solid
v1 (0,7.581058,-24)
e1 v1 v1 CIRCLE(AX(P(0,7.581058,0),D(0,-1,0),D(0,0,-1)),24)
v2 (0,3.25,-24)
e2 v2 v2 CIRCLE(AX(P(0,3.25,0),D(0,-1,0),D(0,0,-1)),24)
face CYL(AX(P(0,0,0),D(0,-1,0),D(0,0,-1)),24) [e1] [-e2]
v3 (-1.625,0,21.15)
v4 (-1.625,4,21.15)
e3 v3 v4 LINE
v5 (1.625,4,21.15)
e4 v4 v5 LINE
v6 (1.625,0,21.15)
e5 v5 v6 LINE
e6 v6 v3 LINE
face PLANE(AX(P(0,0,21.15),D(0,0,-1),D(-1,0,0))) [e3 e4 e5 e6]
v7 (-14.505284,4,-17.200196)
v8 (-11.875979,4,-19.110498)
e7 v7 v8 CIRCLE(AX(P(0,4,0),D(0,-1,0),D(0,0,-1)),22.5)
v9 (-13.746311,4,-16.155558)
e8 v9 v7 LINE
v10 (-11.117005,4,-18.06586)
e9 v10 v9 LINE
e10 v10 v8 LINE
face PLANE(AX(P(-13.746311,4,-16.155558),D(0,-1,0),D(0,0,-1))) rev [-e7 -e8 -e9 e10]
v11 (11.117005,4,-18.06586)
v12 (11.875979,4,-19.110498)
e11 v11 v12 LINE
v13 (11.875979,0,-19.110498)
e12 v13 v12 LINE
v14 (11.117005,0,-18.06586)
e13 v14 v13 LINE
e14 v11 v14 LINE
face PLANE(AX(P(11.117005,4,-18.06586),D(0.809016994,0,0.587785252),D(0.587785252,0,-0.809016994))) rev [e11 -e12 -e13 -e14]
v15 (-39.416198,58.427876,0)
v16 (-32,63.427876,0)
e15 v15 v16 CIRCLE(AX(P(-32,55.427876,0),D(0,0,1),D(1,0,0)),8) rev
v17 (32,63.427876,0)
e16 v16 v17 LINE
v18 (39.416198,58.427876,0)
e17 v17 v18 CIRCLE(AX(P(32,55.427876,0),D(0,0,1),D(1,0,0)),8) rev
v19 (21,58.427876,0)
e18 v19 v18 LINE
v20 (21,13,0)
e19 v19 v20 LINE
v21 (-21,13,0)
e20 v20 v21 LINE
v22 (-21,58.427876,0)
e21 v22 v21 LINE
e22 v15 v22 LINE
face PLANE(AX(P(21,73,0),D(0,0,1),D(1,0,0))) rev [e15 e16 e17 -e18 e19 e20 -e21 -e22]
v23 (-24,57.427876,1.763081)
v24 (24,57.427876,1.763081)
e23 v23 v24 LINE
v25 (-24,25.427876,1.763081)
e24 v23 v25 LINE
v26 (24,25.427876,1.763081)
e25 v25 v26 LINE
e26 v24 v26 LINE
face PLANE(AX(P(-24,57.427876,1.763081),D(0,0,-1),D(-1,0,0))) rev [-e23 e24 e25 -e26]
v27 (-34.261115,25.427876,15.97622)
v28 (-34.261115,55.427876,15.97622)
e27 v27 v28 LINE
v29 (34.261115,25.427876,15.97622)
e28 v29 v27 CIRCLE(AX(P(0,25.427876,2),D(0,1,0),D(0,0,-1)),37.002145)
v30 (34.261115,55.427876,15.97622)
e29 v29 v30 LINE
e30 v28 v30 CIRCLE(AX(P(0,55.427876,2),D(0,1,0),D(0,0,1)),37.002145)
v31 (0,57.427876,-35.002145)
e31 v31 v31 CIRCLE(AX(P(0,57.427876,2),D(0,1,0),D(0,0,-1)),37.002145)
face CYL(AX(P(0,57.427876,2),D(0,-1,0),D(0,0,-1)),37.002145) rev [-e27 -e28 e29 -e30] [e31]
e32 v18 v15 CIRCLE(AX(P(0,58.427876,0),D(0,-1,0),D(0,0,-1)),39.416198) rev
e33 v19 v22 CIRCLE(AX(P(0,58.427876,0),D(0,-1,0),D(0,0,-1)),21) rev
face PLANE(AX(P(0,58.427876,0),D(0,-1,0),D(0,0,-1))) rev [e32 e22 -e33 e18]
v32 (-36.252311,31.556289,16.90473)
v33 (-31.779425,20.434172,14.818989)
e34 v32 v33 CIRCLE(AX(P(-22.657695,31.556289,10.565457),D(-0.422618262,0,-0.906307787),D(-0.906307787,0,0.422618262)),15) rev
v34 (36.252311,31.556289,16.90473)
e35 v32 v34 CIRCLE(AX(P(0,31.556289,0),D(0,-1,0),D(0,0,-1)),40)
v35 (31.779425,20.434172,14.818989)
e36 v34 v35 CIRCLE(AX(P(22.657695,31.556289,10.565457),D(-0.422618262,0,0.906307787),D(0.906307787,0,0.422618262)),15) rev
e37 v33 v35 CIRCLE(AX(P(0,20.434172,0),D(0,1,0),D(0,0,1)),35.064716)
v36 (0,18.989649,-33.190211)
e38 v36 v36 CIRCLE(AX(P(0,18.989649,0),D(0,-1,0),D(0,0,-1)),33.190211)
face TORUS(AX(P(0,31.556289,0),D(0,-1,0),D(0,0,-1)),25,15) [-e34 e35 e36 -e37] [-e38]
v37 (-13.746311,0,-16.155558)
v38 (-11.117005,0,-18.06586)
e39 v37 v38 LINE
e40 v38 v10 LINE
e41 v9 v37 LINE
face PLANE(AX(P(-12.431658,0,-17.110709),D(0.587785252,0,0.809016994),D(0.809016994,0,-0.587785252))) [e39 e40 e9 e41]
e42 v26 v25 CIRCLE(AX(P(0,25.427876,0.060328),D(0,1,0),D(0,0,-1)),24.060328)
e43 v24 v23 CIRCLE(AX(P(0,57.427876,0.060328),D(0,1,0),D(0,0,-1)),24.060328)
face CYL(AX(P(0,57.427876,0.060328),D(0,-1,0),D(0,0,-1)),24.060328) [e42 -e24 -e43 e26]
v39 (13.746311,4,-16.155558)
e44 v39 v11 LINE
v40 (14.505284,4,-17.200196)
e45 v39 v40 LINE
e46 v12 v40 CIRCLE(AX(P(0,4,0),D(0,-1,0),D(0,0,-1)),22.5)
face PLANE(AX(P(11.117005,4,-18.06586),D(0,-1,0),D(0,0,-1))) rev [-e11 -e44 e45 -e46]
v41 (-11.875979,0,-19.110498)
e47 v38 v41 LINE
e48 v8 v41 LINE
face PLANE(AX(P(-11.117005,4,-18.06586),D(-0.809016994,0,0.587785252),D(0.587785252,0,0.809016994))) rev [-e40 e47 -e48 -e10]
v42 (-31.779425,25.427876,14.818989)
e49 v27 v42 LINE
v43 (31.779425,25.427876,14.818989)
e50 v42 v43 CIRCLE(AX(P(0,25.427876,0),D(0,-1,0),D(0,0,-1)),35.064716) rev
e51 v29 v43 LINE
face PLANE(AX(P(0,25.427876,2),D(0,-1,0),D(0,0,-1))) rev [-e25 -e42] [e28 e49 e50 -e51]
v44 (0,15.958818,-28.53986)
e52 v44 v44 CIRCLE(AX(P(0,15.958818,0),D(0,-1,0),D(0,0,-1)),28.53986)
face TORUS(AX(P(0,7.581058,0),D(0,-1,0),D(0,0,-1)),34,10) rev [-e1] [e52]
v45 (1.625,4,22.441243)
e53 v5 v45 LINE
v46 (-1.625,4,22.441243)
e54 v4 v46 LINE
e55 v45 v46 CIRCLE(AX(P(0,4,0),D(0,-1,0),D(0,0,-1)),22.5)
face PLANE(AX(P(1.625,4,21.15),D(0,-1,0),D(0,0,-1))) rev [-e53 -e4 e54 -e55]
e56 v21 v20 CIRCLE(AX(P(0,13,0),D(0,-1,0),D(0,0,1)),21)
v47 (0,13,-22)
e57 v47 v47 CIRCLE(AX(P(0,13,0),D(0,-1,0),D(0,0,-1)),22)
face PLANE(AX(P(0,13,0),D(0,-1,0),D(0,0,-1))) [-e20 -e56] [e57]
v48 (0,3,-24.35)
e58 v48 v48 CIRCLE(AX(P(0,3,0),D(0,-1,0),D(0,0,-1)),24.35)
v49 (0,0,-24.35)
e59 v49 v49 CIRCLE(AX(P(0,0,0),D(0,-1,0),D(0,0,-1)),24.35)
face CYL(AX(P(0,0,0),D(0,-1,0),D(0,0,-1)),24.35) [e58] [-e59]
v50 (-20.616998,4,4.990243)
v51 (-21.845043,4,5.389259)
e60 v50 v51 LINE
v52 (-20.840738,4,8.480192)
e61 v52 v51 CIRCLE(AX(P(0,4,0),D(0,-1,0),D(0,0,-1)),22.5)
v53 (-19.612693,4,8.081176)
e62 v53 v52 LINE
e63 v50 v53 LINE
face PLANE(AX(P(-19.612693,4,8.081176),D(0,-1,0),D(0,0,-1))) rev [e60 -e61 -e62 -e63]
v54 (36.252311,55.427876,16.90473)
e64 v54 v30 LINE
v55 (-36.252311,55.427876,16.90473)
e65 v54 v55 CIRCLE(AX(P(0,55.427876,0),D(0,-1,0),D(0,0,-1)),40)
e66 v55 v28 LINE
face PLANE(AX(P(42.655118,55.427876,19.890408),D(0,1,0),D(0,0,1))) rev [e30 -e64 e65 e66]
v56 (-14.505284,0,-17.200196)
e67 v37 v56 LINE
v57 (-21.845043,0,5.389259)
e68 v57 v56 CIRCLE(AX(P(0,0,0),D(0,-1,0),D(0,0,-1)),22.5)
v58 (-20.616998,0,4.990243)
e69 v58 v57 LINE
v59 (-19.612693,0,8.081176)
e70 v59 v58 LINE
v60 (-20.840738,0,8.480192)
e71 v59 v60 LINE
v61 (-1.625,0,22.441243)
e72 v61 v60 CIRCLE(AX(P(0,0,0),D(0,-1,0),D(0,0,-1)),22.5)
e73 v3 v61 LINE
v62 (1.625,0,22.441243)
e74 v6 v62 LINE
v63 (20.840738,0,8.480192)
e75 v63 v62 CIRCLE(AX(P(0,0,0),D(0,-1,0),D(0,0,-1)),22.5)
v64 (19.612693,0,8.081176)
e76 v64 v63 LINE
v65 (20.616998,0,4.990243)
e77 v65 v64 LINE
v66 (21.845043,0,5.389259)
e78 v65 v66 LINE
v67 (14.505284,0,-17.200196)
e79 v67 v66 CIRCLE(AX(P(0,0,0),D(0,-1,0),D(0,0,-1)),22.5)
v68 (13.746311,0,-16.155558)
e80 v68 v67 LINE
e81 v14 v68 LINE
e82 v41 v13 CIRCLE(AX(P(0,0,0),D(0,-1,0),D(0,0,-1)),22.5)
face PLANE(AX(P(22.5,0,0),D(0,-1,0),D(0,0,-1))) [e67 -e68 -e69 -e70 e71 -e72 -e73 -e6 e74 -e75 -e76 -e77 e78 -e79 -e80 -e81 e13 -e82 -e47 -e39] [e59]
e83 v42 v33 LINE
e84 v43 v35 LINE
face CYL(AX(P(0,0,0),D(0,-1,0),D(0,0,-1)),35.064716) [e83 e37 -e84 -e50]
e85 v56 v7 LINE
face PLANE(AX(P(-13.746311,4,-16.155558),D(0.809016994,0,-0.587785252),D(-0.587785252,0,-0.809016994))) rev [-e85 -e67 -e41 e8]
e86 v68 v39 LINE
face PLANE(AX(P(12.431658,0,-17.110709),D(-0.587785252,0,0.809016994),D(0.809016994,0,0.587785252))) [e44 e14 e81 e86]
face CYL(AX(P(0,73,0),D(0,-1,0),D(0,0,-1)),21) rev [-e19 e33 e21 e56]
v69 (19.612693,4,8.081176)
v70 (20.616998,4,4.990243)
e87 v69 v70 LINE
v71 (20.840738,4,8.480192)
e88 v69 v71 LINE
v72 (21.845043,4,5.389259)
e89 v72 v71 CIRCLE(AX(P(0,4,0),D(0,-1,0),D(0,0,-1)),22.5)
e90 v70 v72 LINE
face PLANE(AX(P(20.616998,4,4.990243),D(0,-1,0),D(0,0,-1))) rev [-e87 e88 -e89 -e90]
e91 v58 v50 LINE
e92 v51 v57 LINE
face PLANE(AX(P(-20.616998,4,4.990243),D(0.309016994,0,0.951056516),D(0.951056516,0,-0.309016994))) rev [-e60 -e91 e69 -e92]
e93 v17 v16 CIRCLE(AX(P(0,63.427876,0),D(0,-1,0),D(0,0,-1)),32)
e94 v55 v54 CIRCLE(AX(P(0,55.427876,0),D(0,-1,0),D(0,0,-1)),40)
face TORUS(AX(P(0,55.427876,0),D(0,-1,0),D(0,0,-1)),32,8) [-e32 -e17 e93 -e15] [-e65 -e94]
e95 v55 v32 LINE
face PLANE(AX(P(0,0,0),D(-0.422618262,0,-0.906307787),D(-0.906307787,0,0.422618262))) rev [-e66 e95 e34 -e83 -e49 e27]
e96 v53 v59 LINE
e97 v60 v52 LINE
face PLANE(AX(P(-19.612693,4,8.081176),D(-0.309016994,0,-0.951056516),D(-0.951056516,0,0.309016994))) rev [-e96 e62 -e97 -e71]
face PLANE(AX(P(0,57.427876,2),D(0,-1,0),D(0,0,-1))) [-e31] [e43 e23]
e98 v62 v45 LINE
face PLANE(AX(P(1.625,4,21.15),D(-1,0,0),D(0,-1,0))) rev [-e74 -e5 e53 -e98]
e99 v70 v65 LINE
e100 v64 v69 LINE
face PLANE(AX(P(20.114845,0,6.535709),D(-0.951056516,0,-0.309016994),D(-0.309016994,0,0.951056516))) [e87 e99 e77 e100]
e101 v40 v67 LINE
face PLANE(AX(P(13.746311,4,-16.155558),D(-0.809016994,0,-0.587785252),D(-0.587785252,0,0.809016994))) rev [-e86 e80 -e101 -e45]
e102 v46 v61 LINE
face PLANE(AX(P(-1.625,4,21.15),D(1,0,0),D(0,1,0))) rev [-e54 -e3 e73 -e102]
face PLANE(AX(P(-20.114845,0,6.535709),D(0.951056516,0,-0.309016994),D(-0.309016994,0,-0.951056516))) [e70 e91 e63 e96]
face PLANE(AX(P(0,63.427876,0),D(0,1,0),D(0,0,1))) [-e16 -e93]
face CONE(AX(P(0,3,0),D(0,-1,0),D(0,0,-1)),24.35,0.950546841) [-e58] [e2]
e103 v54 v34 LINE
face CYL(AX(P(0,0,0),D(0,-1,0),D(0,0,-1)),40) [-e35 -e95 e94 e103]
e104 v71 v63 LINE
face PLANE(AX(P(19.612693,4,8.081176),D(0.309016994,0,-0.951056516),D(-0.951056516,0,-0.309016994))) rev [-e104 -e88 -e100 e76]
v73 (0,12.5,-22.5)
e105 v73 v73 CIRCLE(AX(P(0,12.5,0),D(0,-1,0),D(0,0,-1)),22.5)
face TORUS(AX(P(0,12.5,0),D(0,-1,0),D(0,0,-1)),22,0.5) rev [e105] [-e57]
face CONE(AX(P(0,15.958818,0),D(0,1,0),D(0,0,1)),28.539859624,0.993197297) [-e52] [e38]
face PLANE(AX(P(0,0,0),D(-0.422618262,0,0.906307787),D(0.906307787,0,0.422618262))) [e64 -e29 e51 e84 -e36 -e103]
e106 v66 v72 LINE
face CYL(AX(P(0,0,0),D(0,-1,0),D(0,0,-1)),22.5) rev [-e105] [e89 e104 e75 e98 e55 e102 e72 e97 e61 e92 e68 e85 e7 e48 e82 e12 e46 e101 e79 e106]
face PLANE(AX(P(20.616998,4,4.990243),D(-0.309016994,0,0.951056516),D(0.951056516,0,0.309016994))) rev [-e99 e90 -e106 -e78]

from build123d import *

# Parameters (mm, degrees)
CUT_EXTRUDE3_DEPTH           = 60
CUT_EXTRUDE5_DEPTH           = 2
CUT_EXTRUDE5_DEPTH_BACK      = 30
SKETCH19_W                   = 12
SKETCH19_H                   = 36.5
CUT_REVOLVE2_ANGLE           = 65
CUT_REVOLVE2_OTHER_WAY_ANGLE = 65
SKETCH21_W                   = 3.25
SKETCH21_H                   = 4
BOSS_EXTRUDE3_DEPTH          = 1.35
CIRPATTERN1_COUNT            = 5
CUT_EXTRUDE9_START           = -5
CUT_EXTRUDE9_DEPTH           = 5


with BuildPart() as part:
    # Sketch1 → Revolve1 (revolve)
    with BuildSketch(Plane.XY):
        with BuildLine():
            Line((0, 63.427876097), (32, 63.427876097))
            ThreePointArc((32, 63.427876097), (37.656854249, 61.084730346), (40, 55.427876097))
            Line((40, 55.427876097), (40, 31.556288966))
            ThreePointArc((40, 31.556288966), (38.188122658, 24.409721904), (33.190210564, 18.989648567))
            Line((33.190210564, 18.989648567), (28.539859624, 15.958818353))
            ThreePointArc((28.539859624, 15.958818353), (25.207918228, 12.345436129), (24, 7.581058088))
            Line((24, 7.581058088), (24, 3.25))
            Line((24, 3.25), (24.35, 3))
            Line((24.35, 3), (24.35, 0))
            Line((24.35, 0), (22.5, 0))
            Line((22.5, 0), (22.5, 12.5))
            ThreePointArc((22.5, 12.5), (22.353553391, 12.853553391), (22, 13))
            Line((22, 13), (0, 13))
            Line((0, 13), (0, 63.427876097))
        make_face()
    revolve(axis=Axis((0, 0, 0), (0, 1, 0)))

    # Sketch11 → Cut-Extrude3 (cut)
    with BuildSketch(Plane(origin=(0, 13, 0), x_dir=(-1, 0, 0), z_dir=(0, -1, 0))):
        with BuildLine():
            Line((-21, 0), (21, 0))
            ThreePointArc((21, 0), (0, 21), (-21, 0))
        make_face()
    extrude(amount=-CUT_EXTRUDE3_DEPTH, mode=Mode.SUBTRACT)

    # Sketch9 → Cut-Extrude5 (cut, two sides: drawn at the far end of the back side and taken through both)
    with BuildSketch(Plane(origin=(0, 55.427876097, 0), x_dir=(1, 0, 0), z_dir=(0, 1, 0)).offset(-CUT_EXTRUDE5_DEPTH_BACK)):
        with BuildLine():
            ThreePointArc((-37, -1.601545046), (-0.398454954, -39), (37, -2.398454954))
            ThreePointArc((37, -2.398454954), (0.398454954, 35), (-37, -1.601545046))
        make_face()
        with BuildLine():
            Line((-24, -1.763080838), (24, -1.763080838))
            ThreePointArc((24, -1.763080838), (0, 24), (-24, -1.763080838))
        make_face(mode=Mode.SUBTRACT)
    extrude(amount=CUT_EXTRUDE5_DEPTH + CUT_EXTRUDE5_DEPTH_BACK, mode=Mode.SUBTRACT)

    # Sketch19 → Cut-Revolve2 (revolve, cut)
    with BuildSketch(Plane(origin=(0, 0, 0), x_dir=(0, 0, -1), z_dir=(1, 0, 0))):
        with Locations((-41.064715832, 37.177876097)):
            Rectangle(SKETCH19_W, SKETCH19_H)
    revolve(axis=Axis((0, 0, 0), (0, 1, 0)), revolution_arc=CUT_REVOLVE2_ANGLE, mode=Mode.SUBTRACT)

    # Sketch19 → Cut-Revolve2 other way (revolve, cut)
    with BuildSketch(Plane(origin=(0, 0, 0), x_dir=(0, 0, -1), z_dir=(1, 0, 0))):
        with Locations((-41.064715832, 37.177876097)):
            Rectangle(SKETCH19_W, SKETCH19_H)
    revolve(axis=Axis((0, 0, 0), (0, -1, 0)), revolution_arc=CUT_REVOLVE2_OTHER_WAY_ANGLE, mode=Mode.SUBTRACT)

    # Sketch21 → Boss-Extrude3 (add)
    with BuildSketch(Plane(origin=(0, 0, 22.5), x_dir=(-1, 0, 0), z_dir=(0, 0, -1))):
        with Locations((0, 2)):
            Rectangle(SKETCH21_W, SKETCH21_H)
    boss_extrude3 = extrude(amount=BOSS_EXTRUDE3_DEPTH)

    # CirPattern1: Boss-Extrude3 ×5 about axis
    cirpattern1_axis = Axis((0, 0, 0), (0, -1, 0))
    for i in range(1, CIRPATTERN1_COUNT):
        add(boss_extrude3.rotate(cirpattern1_axis, i * 360 / CIRPATTERN1_COUNT))

    # Sketch22 → Cut-Extrude9 (cut)
    with BuildSketch(Plane(origin=(0, 63.427876097, 0), x_dir=(1, 0, 0), z_dir=(0, 1, 0)).offset(CUT_EXTRUDE9_START)):
        with BuildLine():
            Line((-40, 0), (40, 0))
            ThreePointArc((40, 0), (0, 40), (-40, 0))
        make_face()
    extrude(amount=CUT_EXTRUDE9_DEPTH, mode=Mode.SUBTRACT)


solid = part.part
